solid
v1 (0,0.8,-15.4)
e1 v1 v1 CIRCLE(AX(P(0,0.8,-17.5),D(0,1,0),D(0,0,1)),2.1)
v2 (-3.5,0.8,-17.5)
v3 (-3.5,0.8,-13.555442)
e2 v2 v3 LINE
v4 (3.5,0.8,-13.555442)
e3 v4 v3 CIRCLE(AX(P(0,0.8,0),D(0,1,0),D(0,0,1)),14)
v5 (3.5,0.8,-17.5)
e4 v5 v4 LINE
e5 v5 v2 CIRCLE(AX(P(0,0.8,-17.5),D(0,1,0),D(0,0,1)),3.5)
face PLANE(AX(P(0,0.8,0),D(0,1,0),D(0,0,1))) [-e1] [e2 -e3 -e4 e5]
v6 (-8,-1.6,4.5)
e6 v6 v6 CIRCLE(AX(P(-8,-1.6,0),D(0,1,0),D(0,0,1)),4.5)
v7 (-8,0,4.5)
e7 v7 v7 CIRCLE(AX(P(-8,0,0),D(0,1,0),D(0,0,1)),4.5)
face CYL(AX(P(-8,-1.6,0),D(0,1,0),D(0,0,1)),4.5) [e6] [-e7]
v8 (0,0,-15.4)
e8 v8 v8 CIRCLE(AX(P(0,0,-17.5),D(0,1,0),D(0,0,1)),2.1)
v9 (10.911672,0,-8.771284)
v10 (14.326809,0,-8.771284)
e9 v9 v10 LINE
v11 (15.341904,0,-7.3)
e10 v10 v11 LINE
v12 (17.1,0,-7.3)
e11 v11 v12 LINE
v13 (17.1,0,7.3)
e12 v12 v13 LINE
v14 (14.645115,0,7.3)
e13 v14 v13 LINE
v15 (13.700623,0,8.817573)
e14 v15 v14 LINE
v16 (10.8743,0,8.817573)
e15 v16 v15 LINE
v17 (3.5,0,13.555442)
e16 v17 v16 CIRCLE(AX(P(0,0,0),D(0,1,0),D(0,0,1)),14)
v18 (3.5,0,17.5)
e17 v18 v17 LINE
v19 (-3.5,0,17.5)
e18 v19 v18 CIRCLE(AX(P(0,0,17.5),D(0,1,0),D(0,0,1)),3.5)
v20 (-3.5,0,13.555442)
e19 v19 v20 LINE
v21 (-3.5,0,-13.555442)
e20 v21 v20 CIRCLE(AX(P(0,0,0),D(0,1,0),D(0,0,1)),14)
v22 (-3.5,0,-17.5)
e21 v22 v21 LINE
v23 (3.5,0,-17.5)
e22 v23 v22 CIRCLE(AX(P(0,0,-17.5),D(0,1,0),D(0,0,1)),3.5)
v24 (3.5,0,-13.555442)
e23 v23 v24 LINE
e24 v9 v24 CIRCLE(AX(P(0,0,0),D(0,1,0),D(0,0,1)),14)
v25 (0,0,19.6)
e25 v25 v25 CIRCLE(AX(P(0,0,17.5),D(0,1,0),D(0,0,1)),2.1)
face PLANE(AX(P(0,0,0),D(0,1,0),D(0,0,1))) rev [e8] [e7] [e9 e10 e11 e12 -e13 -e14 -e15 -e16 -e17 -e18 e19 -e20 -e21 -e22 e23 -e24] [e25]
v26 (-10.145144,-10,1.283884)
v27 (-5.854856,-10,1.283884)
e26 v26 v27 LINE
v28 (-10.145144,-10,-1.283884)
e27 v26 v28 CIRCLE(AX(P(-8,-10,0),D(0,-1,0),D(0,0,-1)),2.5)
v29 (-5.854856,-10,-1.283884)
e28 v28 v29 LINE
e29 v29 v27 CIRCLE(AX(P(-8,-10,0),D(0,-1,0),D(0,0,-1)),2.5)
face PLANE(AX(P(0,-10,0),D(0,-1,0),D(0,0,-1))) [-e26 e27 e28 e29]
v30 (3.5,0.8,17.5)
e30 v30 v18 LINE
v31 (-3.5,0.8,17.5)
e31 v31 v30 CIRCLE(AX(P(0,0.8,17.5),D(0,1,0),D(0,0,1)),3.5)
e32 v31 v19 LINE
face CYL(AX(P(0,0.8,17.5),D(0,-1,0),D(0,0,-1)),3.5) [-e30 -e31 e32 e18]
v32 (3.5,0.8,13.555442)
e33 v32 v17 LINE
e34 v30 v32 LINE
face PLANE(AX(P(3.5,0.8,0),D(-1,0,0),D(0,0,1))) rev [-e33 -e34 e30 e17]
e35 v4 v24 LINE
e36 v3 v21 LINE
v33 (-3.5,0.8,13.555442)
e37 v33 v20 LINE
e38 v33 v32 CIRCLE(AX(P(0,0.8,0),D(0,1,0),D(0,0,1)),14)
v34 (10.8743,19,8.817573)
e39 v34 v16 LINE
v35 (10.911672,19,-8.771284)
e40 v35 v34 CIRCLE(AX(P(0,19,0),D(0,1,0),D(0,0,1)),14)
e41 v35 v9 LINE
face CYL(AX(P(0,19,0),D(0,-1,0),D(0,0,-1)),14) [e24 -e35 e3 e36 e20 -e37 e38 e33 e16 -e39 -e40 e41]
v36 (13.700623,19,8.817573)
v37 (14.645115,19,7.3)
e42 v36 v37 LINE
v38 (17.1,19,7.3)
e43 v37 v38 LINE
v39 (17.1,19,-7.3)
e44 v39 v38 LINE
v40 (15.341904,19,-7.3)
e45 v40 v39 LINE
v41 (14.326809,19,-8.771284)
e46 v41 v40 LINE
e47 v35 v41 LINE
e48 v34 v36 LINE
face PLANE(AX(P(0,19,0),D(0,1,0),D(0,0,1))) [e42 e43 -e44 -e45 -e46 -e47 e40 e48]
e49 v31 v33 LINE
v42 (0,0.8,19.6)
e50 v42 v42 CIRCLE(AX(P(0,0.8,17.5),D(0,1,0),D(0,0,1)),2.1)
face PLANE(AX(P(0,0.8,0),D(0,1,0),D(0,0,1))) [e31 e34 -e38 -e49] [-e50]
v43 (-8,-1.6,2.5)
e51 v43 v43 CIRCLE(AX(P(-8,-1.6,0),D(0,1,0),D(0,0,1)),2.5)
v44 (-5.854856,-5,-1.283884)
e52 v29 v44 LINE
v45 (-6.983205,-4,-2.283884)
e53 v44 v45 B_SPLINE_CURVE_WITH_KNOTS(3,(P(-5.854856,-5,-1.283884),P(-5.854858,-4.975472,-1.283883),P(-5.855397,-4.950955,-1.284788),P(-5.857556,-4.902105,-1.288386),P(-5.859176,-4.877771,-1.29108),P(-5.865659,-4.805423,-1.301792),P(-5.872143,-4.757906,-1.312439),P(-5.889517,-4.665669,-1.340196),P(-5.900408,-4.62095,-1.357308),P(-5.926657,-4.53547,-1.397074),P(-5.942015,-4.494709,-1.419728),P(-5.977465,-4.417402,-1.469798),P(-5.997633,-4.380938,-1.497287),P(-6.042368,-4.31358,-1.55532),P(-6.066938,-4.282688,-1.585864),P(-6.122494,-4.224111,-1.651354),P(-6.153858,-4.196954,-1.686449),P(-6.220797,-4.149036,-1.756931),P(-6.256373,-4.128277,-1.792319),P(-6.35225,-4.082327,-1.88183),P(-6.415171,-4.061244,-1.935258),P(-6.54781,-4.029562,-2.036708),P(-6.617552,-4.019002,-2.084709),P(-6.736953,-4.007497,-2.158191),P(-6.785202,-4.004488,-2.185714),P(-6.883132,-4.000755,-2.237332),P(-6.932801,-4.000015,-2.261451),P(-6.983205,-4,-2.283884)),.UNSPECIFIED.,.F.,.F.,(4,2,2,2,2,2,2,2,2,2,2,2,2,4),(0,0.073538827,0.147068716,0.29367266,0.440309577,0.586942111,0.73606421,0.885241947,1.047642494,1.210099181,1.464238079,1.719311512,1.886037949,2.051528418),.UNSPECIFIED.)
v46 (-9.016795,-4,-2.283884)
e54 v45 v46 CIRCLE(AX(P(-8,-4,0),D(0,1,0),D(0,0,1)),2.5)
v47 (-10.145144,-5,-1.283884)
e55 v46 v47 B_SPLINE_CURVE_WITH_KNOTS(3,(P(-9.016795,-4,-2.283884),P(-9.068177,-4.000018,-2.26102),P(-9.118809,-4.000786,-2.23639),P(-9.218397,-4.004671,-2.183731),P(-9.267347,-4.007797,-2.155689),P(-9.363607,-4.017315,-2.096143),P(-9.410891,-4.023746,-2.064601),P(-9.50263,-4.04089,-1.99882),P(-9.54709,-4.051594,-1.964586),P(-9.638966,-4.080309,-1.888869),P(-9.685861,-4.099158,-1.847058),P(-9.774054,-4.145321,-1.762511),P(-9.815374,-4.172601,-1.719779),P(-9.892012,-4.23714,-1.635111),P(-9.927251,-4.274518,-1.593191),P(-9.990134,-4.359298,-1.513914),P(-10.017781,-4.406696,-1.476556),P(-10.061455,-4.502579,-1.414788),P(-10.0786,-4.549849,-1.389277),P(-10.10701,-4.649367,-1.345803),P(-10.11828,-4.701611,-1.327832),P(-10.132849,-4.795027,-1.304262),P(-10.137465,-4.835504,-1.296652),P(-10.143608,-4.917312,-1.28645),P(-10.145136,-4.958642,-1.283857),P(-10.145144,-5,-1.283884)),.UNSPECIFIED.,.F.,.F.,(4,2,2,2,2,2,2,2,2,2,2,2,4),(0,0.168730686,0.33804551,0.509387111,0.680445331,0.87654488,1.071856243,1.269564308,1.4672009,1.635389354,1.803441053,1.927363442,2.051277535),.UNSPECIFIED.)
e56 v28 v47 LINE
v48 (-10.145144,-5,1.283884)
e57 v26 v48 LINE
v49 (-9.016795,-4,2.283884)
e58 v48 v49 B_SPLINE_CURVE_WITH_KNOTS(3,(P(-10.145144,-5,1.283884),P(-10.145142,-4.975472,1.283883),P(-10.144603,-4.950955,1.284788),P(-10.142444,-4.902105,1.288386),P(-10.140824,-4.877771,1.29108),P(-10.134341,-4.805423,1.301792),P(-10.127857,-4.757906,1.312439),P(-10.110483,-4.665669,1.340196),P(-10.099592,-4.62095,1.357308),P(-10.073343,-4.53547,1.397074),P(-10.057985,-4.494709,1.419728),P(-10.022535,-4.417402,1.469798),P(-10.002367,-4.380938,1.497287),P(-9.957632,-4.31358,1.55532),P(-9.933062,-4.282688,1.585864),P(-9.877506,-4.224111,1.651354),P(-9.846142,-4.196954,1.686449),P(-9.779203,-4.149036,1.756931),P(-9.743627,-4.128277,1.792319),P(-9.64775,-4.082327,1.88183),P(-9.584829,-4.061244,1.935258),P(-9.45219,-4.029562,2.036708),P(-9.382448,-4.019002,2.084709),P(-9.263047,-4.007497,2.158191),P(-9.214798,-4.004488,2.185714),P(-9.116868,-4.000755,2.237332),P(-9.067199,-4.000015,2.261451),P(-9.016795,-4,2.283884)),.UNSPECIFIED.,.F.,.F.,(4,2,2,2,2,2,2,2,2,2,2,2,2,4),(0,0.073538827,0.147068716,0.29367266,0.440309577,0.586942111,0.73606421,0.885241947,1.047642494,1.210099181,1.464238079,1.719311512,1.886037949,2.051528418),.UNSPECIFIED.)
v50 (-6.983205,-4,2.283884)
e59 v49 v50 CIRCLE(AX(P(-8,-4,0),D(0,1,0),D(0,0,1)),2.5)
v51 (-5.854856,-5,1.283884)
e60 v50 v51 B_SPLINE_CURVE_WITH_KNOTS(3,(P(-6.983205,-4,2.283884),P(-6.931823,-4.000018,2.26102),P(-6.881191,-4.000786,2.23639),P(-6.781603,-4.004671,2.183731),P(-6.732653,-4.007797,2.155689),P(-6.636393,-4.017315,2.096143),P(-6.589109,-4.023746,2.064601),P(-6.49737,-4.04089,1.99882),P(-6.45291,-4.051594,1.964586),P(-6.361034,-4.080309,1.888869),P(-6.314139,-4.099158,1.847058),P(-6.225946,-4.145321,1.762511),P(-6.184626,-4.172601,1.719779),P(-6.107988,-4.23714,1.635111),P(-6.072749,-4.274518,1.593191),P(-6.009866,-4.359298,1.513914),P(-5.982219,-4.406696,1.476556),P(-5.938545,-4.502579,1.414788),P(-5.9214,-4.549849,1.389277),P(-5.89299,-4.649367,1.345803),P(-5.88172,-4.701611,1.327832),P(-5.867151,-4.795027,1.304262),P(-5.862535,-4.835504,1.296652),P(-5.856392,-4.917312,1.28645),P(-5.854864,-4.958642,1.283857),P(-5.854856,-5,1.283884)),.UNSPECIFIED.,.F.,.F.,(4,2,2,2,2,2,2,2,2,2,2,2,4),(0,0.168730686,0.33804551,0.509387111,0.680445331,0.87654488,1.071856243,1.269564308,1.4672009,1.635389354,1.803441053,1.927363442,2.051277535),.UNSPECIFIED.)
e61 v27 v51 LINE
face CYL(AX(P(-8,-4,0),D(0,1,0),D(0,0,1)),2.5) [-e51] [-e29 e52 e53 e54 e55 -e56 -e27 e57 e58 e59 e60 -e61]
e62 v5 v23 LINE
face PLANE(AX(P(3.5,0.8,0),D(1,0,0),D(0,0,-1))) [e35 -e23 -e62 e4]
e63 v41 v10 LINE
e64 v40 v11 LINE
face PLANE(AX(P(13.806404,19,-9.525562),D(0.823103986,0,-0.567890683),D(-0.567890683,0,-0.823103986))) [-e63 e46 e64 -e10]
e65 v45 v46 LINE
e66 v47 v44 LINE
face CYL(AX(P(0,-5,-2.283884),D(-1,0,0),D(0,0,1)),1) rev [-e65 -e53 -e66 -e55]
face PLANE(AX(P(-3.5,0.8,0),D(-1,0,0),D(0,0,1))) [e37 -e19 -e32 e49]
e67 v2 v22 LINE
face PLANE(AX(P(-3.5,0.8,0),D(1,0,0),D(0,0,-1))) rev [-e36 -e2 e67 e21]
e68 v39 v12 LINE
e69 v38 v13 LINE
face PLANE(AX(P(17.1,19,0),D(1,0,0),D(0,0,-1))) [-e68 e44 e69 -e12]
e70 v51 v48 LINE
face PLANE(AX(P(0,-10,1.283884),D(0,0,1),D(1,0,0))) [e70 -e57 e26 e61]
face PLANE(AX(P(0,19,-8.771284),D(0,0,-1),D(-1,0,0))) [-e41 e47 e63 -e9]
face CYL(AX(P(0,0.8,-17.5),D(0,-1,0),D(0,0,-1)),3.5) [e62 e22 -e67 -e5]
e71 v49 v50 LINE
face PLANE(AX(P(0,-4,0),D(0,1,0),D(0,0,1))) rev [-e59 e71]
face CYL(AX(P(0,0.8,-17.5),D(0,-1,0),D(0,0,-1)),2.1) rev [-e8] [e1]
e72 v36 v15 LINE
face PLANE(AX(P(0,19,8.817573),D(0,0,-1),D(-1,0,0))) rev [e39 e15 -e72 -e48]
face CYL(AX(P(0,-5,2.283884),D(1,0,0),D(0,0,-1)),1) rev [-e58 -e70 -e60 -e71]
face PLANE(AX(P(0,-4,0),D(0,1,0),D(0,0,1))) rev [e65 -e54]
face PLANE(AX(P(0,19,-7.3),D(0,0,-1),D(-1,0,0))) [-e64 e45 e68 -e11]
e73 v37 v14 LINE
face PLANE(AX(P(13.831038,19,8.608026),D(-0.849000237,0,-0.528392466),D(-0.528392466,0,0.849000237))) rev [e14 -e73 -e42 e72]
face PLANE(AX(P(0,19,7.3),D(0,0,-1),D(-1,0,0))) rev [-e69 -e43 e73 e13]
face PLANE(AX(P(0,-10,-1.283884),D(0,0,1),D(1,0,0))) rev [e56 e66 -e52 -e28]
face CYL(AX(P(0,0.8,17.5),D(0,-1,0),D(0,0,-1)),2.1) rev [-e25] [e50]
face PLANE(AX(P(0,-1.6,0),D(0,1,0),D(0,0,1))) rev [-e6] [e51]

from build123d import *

# Parameters (mm, degrees)
SKETCH1_R           = 4.5
SKETCH1_R_2         = 2.5
BOSS_EXTRUDE1_DEPTH = 19
SKETCH1_3_R         = 4.5
SKETCH1_3_R_2       = 2.5
SKETCH1_3_R_3       = 2.1
BOSS_EXTRUDE2_DEPTH = 1.6
SKETCH1_4_R         = 2.1
BOSS_EXTRUDE3_DEPTH = 0.8
SKETCH1_5_R         = 2.5
BOSS_EXTRUDE4_DEPTH = 4
BOSS_EXTRUDE5_DEPTH = 6
FILLET1_R           = 1
FILLET2_R           = 1


with BuildPart() as part:
    # Sketch1 → Boss-Extrude1 (new body)
    # profile 1 of 3: a face of its own
    with BuildSketch(Plane(origin=(0, 0, 0), x_dir=(1, 0, 0), z_dir=(0, 1, 0))):
        with BuildLine():
            ThreePointArc((10.911671632, 8.771283954), (-13.999968399, 0.029746015), (10.874300232, -8.817573048))
            Line((10.874300232, -8.817573048), (13.700622891, -8.817573048))
            Line((13.700622891, -8.817573048), (14.645115165, -7.3))
            Line((14.645115165, -7.3), (17.1, -7.3))
            Line((17.1, -7.3), (17.1, 7.3))
            Line((17.1, 7.3), (15.341903899, 7.3))
            Line((15.341903899, 7.3), (14.326809253, 8.771283954))
            Line((14.326809253, 8.771283954), (10.911671632, 8.771283954))
        make_face()
        with Locations((-8, 0)):
            Circle(SKETCH1_R, mode=Mode.SUBTRACT)
    # profile 2 of 3: a face of its own
    with BuildSketch(Plane(origin=(0, 0, 0), x_dir=(1, 0, 0), z_dir=(0, 1, 0))):
        with Locations((-8, 0)):
            Circle(SKETCH1_R)
        with Locations((-8, 0)):
            Circle(SKETCH1_R_2, mode=Mode.SUBTRACT)
    # profile 3 of 3: a face of its own
    with BuildSketch(Plane(origin=(0, 0, 0), x_dir=(1, 0, 0), z_dir=(0, 1, 0))):
        with Locations((-8, 0)):
            Circle(SKETCH1_R_2)
    extrude(amount=BOSS_EXTRUDE1_DEPTH)

    # Sketch1<3> → Boss-Extrude2 (add)
    # profile 1 of 2: a face of its own
    with BuildSketch(Plane(origin=(0, 0, 0), x_dir=(1, 0, 0), z_dir=(0, 1, 0))):
        with Locations(Location((-8, 0, 0), (0, 0, 270))):
            Circle(SKETCH1_3_R)
        with Locations(Location((-8, 0, 0), (0, 0, 270))):
            Circle(SKETCH1_3_R_2, mode=Mode.SUBTRACT)
    # profile 2 of 2: a face of its own
    with BuildSketch(Plane(origin=(0, 0, 0), x_dir=(1, 0, 0), z_dir=(0, 1, 0))):
        with Locations((0, 17.5)):
            Circle(SKETCH1_3_R_3)
    extrude(amount=-BOSS_EXTRUDE2_DEPTH)


with BuildPart() as boss_extrude2_kept_piece:
    # of the separate pieces the step leaves, the one the design keeps (boss_extrude2_pieces_kept)
    add(part.part.solids().sort_by_distance((10.911671632, 0, -8.771283954))[0])

    # Sketch1<4> → Boss-Extrude3 (add)
    # profile 1 of 2: a face of its own
    with BuildSketch(Plane(origin=(0, 0, 0), x_dir=(1, 0, 0), z_dir=(0, 1, 0))):
        with BuildLine():
            ThreePointArc((-3.5, 13.555441712), (0, 14), (3.5, 13.555441712))
            Line((3.5, 13.555441712), (3.5, 17.5))
            ThreePointArc((3.5, 17.5), (0, 21), (-3.5, 17.5))
            Line((-3.5, 17.5), (-3.5, 13.555441712))
        make_face()
        with Locations(Location((0, 17.5, 0), (0, 0, 270))):
            Circle(SKETCH1_4_R, mode=Mode.SUBTRACT)
    # profile 2 of 2: a face of its own
    with BuildSketch(Plane(origin=(0, 0, 0), x_dir=(1, 0, 0), z_dir=(0, 1, 0))):
        with BuildLine():
            ThreePointArc((3.5, -13.555441712), (0, -14), (-3.5, -13.555441712))
            Line((-3.5, -13.555441712), (-3.5, -17.5))
            ThreePointArc((-3.5, -17.5), (0, -21), (3.5, -17.5))
            Line((3.5, -17.5), (3.5, -13.555441712))
        make_face()
        with Locations(Location((0, -17.5, 0), (0, 0, 270))):
            Circle(SKETCH1_4_R, mode=Mode.SUBTRACT)
    extrude(amount=BOSS_EXTRUDE3_DEPTH)

    # Sketch1<5> → Boss-Extrude4 (add)
    with BuildSketch(Plane(origin=(0, 0, 0), x_dir=(1, 0, 0), z_dir=(0, 1, 0))):
        with Locations(Location((-8, 0, 0), (0, 0, 270))):
            Circle(SKETCH1_5_R)
    extrude(amount=-BOSS_EXTRUDE4_DEPTH)

    # Sketch5 → Boss-Extrude5 (add)
    with BuildSketch(Plane.XZ.offset(4)):
        with BuildLine():
            Line((-9.968251002, 1.283884289), (-10.145143616, 1.283884289))
            ThreePointArc((-10.145143616, 1.283884289), (-10.5, 0), (-10.145143616, -1.283884289))
            Line((-10.145143616, -1.283884289), (-9.968251002, -1.283884289))
            Line((-9.968251002, -1.283884289), (-9.968251002, 1.283884289))
        make_face()
        with BuildLine():
            Line((-5.854856384, 1.283884289), (-9.968251002, 1.283884289))
            Line((-9.968251002, 1.283884289), (-9.968251002, -1.283884289))
            Line((-9.968251002, -1.283884289), (-5.854856384, -1.283884289))
            ThreePointArc((-5.854856384, -1.283884289), (-5.590346598, -0.666010871), (-5.5, 0))
            ThreePointArc((-5.5, 0), (-5.590346598, 0.666010871), (-5.854856384, 1.283884289))
        make_face()
    extrude(amount=BOSS_EXTRUDE5_DEPTH)

    # Fillet1
    # the kernel refuses this fillet: 1 mm, written as the material it adds along each edge
    with BuildSketch(Plane(origin=(-12.645143616, -4, 1.283884289), x_dir=(0, 0, 1), z_dir=(1, 0, 0))) as fillet1_piece_1_section:
        with BuildLine():
            CenterArc((FILLET1_R, FILLET1_R), FILLET1_R, 180, 90)
            Line((0, FILLET1_R), (0, 0))
            Line((0, 0), (FILLET1_R, 0))
        make_face()
    fillet1_piece_1 = extrude(amount=9.290287231, mode=Mode.PRIVATE)
    fillet1_piece_1 = fillet1_piece_1 & Plane(origin=(-8, -4.238121926, 0), x_dir=(0, 0, 1), z_dir=(0, 1, 0)) * Cylinder(2.5, 23, mode=Mode.PRIVATE)
    add(fillet1_piece_1)

    # Fillet2
    # the kernel refuses this fillet: 1 mm, written as the material it adds along each edge
    with BuildSketch(Plane(origin=(-12.645143616, -4, -1.283884289), x_dir=(0, -1, 0), z_dir=(1, 0, 0))) as fillet2_piece_1_section:
        with BuildLine():
            CenterArc((FILLET2_R, FILLET2_R), FILLET2_R, 180, 90)
            Line((0, FILLET2_R), (0, 0))
            Line((0, 0), (FILLET2_R, 0))
        make_face()
    fillet2_piece_1 = extrude(amount=9.290287231, mode=Mode.PRIVATE)
    fillet2_piece_1 = fillet2_piece_1 & Plane(origin=(-8, -4.238121979, 0), x_dir=(-0.8580574462690832, 0, 0.5135537156930905), z_dir=(0, 1, 0)) * Cylinder(2.5, 23, mode=Mode.PRIVATE)
    add(fillet2_piece_1)


solid = boss_extrude2_kept_piece.part
